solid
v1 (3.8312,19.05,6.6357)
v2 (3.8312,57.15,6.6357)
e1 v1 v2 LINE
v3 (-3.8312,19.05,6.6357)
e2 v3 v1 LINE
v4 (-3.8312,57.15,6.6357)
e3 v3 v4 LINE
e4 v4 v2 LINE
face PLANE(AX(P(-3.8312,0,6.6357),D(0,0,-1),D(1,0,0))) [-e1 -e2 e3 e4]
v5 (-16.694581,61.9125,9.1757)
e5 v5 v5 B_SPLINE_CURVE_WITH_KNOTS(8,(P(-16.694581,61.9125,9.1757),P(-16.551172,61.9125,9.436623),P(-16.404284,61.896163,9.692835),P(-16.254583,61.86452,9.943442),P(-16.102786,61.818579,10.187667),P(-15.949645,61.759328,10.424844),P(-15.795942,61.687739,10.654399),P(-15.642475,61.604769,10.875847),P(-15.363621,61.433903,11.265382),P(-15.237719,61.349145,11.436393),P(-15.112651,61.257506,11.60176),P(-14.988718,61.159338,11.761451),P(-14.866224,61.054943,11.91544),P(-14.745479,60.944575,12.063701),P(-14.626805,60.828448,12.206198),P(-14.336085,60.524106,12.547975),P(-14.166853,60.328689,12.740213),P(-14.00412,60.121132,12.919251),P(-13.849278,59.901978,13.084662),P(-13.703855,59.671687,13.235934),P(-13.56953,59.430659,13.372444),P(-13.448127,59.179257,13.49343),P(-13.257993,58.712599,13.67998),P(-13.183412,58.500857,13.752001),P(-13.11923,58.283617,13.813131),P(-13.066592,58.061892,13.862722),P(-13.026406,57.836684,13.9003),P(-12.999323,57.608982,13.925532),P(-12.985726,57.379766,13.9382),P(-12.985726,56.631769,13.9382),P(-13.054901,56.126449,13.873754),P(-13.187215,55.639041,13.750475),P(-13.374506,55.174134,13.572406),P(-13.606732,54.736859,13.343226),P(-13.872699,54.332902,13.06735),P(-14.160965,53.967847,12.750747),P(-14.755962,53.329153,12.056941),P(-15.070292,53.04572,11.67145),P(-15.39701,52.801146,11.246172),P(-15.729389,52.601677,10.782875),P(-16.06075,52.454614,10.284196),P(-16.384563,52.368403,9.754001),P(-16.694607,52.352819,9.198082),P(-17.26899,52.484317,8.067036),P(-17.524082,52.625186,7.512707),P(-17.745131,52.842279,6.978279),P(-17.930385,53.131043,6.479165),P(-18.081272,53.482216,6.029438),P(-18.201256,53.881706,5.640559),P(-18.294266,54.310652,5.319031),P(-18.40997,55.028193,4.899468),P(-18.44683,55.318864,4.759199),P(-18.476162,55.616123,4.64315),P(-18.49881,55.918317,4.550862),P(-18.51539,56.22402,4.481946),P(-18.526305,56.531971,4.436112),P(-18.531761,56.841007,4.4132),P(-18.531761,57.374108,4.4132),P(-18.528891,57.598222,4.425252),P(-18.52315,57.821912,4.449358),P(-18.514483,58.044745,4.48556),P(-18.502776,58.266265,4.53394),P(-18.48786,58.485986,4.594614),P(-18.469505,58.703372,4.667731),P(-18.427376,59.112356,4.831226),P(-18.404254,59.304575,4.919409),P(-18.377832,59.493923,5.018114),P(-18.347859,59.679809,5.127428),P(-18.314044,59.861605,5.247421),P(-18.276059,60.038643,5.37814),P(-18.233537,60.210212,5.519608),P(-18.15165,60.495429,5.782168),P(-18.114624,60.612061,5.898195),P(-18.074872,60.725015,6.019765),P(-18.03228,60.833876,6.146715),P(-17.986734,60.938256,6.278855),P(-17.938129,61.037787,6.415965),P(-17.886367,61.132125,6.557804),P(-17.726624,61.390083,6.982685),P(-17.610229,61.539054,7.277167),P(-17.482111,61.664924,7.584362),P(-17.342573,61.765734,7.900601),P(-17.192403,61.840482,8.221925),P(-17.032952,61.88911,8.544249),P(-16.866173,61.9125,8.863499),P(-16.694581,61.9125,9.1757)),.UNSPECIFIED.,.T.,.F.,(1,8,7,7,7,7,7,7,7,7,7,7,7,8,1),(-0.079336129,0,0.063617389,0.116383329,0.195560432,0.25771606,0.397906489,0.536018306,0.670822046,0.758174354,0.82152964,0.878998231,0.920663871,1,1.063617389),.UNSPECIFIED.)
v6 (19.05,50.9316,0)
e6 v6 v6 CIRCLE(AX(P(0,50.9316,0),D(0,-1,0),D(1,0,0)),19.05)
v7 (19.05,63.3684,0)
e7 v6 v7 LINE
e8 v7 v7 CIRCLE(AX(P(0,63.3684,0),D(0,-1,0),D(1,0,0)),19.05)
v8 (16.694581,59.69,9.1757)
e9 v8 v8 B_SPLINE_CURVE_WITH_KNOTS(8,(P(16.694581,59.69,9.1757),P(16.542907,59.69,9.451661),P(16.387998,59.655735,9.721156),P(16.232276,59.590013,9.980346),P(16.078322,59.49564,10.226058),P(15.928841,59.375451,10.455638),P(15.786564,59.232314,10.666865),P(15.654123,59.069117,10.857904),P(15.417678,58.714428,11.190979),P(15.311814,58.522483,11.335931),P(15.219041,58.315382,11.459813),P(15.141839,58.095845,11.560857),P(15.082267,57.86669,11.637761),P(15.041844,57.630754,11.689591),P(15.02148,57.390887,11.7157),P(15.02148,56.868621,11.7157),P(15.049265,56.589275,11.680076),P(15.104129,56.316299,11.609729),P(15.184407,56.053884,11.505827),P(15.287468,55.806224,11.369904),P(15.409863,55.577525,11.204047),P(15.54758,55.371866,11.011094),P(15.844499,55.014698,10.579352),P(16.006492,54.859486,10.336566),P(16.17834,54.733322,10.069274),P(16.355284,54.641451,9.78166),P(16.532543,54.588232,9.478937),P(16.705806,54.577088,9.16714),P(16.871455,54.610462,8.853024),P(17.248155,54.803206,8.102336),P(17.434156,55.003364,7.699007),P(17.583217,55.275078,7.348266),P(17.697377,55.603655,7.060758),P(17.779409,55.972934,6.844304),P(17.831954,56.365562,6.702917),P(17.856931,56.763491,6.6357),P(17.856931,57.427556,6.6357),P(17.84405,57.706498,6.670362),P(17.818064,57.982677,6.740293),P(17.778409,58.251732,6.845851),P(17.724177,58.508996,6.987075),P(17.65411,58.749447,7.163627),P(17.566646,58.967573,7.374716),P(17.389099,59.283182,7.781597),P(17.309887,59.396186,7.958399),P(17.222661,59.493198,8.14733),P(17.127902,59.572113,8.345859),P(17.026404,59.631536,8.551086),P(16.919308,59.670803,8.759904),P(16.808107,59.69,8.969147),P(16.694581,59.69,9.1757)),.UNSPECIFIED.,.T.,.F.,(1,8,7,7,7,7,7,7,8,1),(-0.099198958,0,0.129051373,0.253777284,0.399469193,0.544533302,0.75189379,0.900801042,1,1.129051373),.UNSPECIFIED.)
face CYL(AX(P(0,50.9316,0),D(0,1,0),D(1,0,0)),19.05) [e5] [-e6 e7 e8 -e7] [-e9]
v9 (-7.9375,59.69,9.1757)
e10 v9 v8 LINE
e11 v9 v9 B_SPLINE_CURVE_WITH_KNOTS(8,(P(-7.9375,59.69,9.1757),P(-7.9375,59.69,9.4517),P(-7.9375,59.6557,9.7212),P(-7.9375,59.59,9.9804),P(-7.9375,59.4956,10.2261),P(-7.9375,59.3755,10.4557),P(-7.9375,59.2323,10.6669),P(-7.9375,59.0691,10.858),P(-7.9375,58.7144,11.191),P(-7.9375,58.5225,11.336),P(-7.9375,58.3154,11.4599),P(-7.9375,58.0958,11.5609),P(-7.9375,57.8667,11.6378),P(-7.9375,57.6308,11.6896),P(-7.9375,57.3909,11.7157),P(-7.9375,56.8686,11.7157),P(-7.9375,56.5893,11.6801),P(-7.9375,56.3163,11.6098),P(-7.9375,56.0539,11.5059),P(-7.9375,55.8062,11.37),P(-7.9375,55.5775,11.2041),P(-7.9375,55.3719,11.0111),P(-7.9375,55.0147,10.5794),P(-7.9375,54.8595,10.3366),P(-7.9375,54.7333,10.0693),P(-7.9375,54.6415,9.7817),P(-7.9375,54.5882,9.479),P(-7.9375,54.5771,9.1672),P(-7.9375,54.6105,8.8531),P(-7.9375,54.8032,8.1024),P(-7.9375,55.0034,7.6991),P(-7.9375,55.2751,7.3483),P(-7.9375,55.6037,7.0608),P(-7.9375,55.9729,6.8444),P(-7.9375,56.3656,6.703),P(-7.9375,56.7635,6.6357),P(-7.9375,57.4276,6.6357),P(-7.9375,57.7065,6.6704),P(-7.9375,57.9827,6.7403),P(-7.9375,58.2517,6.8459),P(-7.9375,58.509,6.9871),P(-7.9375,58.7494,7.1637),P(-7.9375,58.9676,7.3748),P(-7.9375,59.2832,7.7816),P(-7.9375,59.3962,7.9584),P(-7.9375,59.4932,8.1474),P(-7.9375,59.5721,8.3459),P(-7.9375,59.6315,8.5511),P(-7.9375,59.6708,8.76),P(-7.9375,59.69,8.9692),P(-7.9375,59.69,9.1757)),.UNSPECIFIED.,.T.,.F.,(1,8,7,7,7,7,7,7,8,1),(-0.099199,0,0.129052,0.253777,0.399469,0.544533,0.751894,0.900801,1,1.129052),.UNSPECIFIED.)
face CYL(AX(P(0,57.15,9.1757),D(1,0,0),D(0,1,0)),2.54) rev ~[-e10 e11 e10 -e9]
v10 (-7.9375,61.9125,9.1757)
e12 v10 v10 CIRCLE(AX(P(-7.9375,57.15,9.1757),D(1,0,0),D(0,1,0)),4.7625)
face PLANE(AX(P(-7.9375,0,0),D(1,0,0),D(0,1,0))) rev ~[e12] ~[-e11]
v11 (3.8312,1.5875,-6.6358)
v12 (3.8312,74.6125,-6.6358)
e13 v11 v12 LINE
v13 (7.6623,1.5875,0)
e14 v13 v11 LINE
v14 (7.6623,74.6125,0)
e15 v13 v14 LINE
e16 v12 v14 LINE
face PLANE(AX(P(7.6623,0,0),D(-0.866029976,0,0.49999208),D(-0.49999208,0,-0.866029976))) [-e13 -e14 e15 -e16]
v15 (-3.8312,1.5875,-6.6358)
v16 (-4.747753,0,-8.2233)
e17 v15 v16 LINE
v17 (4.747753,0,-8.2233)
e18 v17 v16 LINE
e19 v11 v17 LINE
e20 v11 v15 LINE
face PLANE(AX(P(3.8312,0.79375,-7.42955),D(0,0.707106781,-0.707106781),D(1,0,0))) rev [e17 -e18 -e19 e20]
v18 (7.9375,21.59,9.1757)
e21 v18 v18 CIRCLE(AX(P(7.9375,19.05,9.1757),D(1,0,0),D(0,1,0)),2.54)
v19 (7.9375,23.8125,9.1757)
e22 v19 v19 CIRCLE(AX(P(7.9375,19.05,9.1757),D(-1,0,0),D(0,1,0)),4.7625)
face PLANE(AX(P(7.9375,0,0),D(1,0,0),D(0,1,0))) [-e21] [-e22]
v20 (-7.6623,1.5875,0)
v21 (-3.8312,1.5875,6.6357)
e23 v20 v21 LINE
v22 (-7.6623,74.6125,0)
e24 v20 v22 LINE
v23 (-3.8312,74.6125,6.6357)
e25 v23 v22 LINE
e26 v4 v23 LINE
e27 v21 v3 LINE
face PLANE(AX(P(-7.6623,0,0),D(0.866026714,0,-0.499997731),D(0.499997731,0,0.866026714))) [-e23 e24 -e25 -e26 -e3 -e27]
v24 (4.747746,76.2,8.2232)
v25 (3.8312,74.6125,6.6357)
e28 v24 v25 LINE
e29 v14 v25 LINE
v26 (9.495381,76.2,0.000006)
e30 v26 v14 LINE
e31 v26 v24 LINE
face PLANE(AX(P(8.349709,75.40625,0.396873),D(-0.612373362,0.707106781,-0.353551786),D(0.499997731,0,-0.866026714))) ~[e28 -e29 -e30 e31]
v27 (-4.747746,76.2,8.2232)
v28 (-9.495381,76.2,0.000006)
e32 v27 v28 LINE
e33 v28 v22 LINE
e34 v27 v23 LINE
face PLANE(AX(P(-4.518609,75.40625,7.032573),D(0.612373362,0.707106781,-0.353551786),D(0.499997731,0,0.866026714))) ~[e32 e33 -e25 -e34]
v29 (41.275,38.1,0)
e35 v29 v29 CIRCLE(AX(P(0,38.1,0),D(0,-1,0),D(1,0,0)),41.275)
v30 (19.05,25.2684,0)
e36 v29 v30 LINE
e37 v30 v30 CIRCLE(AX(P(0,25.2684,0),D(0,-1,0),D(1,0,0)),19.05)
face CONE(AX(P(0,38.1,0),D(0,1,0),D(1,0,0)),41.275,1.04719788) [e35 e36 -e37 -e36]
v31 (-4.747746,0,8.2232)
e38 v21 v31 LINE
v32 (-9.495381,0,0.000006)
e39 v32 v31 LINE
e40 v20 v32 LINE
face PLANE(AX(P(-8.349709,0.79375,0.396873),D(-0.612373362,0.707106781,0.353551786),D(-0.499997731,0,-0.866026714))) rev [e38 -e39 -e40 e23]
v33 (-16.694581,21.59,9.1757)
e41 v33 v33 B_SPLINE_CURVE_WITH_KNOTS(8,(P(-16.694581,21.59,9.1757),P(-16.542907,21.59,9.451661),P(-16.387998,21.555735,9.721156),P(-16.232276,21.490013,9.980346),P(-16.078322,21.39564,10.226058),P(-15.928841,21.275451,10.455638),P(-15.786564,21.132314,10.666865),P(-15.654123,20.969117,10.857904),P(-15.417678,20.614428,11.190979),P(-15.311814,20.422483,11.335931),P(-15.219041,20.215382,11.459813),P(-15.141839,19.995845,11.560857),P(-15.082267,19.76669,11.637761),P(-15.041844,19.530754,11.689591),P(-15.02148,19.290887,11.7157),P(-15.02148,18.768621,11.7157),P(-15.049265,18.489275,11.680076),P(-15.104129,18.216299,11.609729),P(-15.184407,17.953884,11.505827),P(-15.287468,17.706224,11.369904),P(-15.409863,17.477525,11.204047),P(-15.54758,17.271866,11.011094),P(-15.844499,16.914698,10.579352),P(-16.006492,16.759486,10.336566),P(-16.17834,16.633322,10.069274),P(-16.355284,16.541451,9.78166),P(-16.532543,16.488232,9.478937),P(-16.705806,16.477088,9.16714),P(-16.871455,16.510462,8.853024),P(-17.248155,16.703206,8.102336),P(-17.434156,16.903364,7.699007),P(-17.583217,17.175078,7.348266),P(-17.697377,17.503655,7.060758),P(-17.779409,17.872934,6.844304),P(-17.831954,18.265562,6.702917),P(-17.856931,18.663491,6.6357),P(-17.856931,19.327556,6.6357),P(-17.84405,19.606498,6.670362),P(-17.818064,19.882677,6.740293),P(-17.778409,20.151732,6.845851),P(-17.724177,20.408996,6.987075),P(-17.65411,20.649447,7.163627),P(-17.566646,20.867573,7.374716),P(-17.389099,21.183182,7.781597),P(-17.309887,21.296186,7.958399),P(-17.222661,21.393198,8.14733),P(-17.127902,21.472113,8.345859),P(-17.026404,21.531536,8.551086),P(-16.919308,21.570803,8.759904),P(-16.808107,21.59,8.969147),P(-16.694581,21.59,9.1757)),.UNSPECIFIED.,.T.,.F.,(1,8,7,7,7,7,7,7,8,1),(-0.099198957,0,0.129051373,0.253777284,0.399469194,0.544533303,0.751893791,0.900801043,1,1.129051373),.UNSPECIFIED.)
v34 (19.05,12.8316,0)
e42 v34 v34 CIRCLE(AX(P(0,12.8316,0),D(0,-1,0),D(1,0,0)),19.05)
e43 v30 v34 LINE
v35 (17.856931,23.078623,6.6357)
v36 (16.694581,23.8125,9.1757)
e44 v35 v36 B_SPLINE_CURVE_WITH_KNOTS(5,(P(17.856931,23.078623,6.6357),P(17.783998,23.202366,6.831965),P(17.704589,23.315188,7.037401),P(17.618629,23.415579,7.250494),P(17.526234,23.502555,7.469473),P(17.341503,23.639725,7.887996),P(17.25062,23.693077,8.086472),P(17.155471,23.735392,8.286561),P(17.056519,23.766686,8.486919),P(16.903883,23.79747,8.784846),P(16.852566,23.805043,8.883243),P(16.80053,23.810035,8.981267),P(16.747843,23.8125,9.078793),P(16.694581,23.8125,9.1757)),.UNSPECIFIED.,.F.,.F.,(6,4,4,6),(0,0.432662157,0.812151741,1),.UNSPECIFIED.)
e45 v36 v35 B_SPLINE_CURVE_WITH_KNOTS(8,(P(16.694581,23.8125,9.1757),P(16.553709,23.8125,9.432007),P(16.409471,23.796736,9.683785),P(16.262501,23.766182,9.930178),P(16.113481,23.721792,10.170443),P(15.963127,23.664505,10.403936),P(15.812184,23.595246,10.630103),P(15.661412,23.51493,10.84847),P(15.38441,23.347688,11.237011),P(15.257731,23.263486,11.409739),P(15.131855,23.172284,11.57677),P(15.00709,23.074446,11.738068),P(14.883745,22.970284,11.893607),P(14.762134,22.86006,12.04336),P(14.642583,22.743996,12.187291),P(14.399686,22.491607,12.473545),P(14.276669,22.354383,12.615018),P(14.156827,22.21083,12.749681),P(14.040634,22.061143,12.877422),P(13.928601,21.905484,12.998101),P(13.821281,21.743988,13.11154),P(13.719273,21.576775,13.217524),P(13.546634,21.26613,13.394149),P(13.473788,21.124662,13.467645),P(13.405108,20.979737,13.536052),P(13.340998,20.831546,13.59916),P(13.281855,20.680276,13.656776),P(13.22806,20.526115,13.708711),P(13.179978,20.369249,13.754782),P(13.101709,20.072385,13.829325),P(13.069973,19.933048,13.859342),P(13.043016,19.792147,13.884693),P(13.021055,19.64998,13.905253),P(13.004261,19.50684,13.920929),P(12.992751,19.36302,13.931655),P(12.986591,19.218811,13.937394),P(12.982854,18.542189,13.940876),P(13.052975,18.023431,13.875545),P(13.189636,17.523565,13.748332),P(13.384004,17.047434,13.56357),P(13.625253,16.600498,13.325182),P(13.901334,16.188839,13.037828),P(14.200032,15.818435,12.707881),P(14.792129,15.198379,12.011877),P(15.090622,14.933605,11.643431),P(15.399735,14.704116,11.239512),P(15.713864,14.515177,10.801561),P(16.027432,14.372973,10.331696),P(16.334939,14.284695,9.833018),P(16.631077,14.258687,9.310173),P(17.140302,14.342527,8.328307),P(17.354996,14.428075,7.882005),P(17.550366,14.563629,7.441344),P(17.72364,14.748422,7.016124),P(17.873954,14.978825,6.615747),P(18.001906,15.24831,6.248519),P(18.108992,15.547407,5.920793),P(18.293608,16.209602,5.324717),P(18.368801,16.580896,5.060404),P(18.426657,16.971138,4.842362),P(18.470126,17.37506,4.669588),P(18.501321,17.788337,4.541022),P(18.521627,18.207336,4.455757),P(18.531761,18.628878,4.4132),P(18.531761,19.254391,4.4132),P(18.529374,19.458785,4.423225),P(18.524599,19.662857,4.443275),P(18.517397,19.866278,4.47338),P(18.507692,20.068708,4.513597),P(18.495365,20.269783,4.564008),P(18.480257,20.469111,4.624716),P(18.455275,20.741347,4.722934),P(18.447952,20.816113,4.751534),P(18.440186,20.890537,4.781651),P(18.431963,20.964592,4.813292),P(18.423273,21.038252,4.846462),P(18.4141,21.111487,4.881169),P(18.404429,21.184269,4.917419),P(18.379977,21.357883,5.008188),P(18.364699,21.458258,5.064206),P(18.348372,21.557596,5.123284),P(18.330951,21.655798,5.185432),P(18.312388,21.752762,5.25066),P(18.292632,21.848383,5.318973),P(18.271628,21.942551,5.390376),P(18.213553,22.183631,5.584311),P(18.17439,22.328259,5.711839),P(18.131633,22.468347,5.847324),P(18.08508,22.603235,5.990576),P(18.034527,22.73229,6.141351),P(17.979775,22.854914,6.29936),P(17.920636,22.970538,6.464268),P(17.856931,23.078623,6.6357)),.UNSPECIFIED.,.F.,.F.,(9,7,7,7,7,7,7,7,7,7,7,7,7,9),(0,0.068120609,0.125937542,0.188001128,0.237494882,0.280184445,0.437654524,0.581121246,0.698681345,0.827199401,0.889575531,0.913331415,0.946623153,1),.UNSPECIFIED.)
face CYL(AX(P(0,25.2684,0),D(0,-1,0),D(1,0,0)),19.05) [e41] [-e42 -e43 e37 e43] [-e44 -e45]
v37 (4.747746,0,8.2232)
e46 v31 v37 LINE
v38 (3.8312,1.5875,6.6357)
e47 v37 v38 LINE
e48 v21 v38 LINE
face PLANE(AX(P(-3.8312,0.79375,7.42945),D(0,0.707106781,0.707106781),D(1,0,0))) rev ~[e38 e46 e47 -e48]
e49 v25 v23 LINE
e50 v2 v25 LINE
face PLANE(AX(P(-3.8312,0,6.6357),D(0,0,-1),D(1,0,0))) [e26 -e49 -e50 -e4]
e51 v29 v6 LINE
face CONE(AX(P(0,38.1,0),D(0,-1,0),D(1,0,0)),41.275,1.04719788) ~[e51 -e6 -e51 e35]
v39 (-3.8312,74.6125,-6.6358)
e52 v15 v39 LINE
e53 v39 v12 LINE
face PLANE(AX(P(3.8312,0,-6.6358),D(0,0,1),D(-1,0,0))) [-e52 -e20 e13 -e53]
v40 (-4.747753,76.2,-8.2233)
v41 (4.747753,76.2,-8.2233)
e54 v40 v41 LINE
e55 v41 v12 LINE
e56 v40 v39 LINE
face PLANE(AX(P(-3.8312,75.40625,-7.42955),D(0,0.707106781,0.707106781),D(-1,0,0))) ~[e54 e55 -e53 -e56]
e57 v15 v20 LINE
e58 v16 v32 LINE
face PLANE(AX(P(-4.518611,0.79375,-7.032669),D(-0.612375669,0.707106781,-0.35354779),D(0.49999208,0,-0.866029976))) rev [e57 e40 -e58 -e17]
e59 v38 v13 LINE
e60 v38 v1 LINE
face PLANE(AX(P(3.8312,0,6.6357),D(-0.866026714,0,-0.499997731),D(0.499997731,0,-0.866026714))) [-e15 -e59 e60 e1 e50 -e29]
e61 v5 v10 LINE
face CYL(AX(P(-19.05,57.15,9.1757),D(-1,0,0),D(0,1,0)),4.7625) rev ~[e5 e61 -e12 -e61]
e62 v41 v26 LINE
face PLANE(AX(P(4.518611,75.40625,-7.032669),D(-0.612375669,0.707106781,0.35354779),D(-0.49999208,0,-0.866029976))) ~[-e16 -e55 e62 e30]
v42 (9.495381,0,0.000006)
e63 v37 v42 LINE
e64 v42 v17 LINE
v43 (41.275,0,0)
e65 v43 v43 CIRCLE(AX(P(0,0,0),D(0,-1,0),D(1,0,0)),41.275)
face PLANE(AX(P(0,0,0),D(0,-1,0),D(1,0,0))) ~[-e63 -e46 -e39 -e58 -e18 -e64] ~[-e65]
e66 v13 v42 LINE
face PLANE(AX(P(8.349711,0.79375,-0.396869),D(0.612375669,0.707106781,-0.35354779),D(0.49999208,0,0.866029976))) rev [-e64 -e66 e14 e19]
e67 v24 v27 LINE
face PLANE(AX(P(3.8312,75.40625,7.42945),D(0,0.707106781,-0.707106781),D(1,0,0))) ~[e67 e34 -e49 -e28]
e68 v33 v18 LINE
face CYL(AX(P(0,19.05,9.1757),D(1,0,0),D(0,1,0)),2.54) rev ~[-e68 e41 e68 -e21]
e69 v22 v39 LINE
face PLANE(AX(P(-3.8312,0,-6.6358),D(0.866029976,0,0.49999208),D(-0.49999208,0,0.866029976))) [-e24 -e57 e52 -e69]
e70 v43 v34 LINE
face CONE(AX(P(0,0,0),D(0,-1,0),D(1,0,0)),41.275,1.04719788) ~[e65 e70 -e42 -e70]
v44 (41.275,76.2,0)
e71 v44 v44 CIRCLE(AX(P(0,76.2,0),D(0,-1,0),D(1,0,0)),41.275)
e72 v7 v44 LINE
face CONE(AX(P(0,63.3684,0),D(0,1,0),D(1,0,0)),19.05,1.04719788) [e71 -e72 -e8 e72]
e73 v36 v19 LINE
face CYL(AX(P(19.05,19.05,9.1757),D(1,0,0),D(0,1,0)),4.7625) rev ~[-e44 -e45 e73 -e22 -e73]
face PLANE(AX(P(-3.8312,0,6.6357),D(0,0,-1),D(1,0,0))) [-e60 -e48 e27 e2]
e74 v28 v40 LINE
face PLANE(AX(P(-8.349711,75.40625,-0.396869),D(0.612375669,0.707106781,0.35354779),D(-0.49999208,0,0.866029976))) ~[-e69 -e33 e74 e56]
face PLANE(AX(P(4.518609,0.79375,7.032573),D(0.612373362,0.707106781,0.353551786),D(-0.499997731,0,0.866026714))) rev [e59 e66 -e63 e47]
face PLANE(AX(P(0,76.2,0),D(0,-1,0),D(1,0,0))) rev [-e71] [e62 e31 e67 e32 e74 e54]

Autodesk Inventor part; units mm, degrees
ref_plane "XZ Plane" through (0, 0, 0) normal (0, 1, 0) x (-1, 0, 0)
sketch "Sketch15" plane through (0, 0, 0) normal (0, 0, 1) x (1, 0, 0)
  line L0 (41.275, 0) -> (41.275, 76.2) construction
  line L1 (0, 0) -> (41.275, 0)
  line L2 (0, 76.2) -> (41.275, 76.2)
  line L3 (19.05, 0) -> (19.05, 76.2) construction
  line L4 (0, 76.2) -> (0, 0)
  line L5 (19.05, 19.05) -> (41.275, 19.05) construction
  line L6 (41.275, 0) -> (19.05, 12.8316)
  line L7 (41.275, 38.1) -> (19.05, 25.2684)
  line L8 (19.05, 25.2684) -> (41.275, 25.2684) construction
  line L9 (19.05, 25.2684) -> (19.05, 12.8316)
  line L10 (41.275, 38.1) -> (19.05, 50.9316)
  line L11 (19.05, 50.9316) -> (19.05, 63.3684)
  line L12 (19.05, 63.3684) -> (41.275, 76.2)
  line L13 (41.275, 38.1) -> (19.05, 38.1) construction
  line L14 (19.05, 63.3684) -> (41.275, 63.3684) construction
  dimension "d85" = 41.275
  dimension "d86" = 76.2
  dimension "d87" = 19.05
  dimension "d88" = 41.275
  dimension "d89" = 38.1
  dimension "centerLineForSpool" = 19.05
  dimension "d93" = 30
  dimension "d94" = 30
  dimension "d95" = 30
  dimension "d96" = 30
revolve "Revolution2" add sketch "Sketch15" angle 360 about axis through (0, 76.2, 0) along (0, -1, 0)
sketch "Sketch16" plane through (0, 0, 0) normal (0, -1, 0) x (1, 0, 0)
  line L0 (-7.6623, 0) -> (-3.8312, 6.6357)
  line L1 (-3.8312, 6.6357) -> (3.8312, 6.6357)
  line L2 (3.8312, 6.6357) -> (7.6623, 0)
  line L3 (7.6623, 0) -> (3.8312, -6.6358)
  line L4 (3.8312, -6.6358) -> (-3.8312, -6.6358)
  line L5 (-3.8312, -6.6358) -> (-7.6623, 0)
  point P0 (0, 0)
  point P1 (0, 0)
  dimension "d103" = 13.2715
extrude "Extrusion11" cut sketch "Sketch16" against normal through all
sketch "Sketch17" plane through (0, 0, 0) normal (1, 0, 0) x (0, 1, 0)
  circle A0 centre (57.15, 9.1757) radius 2.54
  circle A1 centre (19.05, 9.1757) radius 2.54
  line L0 (0, 41.275) -> (0, -41.275) projected
  line L1 (76.2, 41.275) -> (76.2, -41.275) projected
  line L2 (0, 6.6357) -> (76.2, 6.6357) projected
  point P0 (0, 0)
  dimension "d110" = 19.05
  dimension "d111" = 19.05
  dimension "d112" = 5.08
extrude "Extrusion13" cut sketch "Sketch17" along normal through all both and the other way through all
ref_plane "Work Plane4" through (-19.05, 0, 0) normal (1, 0, 0) x (0, 1, 0)
sketch "Sketch22" plane through (-19.05, 0, 0) normal (1, 0, 0) x (0, 1, 0)
  spline S0 degree 8 poles (59.69, 9.1757) (59.69, 9.4517) (59.6557, 9.7212) (59.59, 9.9804) (59.4956, 10.2261) (59.3755, 10.4557) (59.2323, 10.6669) (59.0691, 10.858) (58.7144, 11.191) (58.5225, 11.336) (58.3154, 11.4599) (58.0958, 11.5609) (57.8667, 11.6378) (57.6308, 11.6896) (57.3909, 11.7157) (56.8686, 11.7157) (56.5893, 11.6801) (56.3163, 11.6098) (56.0539, 11.5059) (55.8062, 11.37) (55.5775, 11.2041) (55.3719, 11.0111) (55.0147, 10.5794) (54.8595, 10.3366) (54.7333, 10.0693) (54.6415, 9.7817) (54.5882, 9.479) (54.5771, 9.1672) (54.6105, 8.8531) (54.8032, 8.1024) (55.0034, 7.6991) (55.2751, 7.3483) (55.6037, 7.0608) (55.9729, 6.8444) (56.3656, 6.703) (56.7635, 6.6357) (57.4276, 6.6357) (57.7065, 6.6704) (57.9827, 6.7403) (58.2517, 6.8459) (58.509, 6.9871) (58.7494, 7.1637) (58.9676, 7.3748) (59.2832, 7.7816) (59.3962, 7.9584) (59.4932, 8.1474) (59.5721, 8.3459) (59.6315, 8.5511) (59.6708, 8.76) (59.69, 8.9692) (59.69, 9.1757) knots 0 0 0 0 0 0 0 0 0 0.129052 0.129052 0.129052 0.129052 0.129052 0.129052 0.129052 0.253777 0.253777 0.253777 0.253777 0.253777 0.253777 0.253777 0.399469 0.399469 0.399469 0.399469 0.399469 0.399469 0.399469 0.544533 0.544533 0.544533 0.544533 0.544533 0.544533 0.544533 0.751894 0.751894 0.751894 0.751894 0.751894 0.751894 0.751894 0.900801 0.900801 0.900801 0.900801 0.900801 0.900801 0.900801 1 1 1 1 1 1 1 1 1 projected
  circle A0 centre (57.15, 9.1757) radius 4.7625
  circle A1 centre (57.15, 9.1757) radius 2.54 construction
  line L0 (57.15, 6.6357) -> (76.2, 6.6357) construction
  line L1 (76.2, 41.275) -> (76.2, -41.275) construction
  point P0 (0, 0)
  dimension "d121" = 19.05
  dimension "d122" = 5.08
  dimension "d125" = 9.525
extrude "Extrusion16" cut sketch "Sketch22" along normal blind 11.1125
ref_plane "Work Plane5" through (19.05, 0, 0) normal (1, 0, 0) x (0, 1, 0)
sketch "Sketch23" plane through (19.05, 0, 0) normal (1, 0, 0) x (0, 1, 0)
  line L0 (19.05, 6.6357) -> (57.15, 6.6357) projected
  circle A0 centre (19.05, 9.1757) radius 2.54 construction
  line L1 (0, 41.275) -> (0, -41.275) projected
  circle A1 centre (19.05, 9.1757) radius 4.7625
  point P0 (0, 0)
  dimension "d127" = 5.08
  dimension "d128" = 19.05
  dimension "d129" = 9.525
extrude "Extrusion17" cut sketch "Sketch23" against normal blind 11.1125
chamfer "Chamfer10" distance 1.5875 angle 45 12 edges at (0, 76.2, -6.6358) (5.7467, 76.2, -3.3179) (5.7467, 76.2, 3.3179) (0, 76.2, 6.6357) (-5.7467, 76.2, 3.3179) (-5.7467, 76.2, -3.3179) (-5.7467, 0, -3.3179) (-5.7467, 0, 3.3179) (0, 0, 6.6357) (5.7467, 0, 3.3179) (5.7467, 0, -3.3179) (0, 0, -6.6358)
equation "\"d85\" = spoolExteriorRadius"
equation "\"d86\" = spoolOverallHeight"
equation "\"d88\" = d85"
equation "\"d89\" = 0.5 * spoolOverallHeight"
equation "\"centerLineForSpool\" = 0.25 * spoolOverallHeight"
equation "\"d103\" = hexDiameter"
equation "\"d110\" = centerLineForSpool"
equation "\"d111\" = centerLineForSpool"
equation "\"d112\" = holeForString"
equation "\"d121\" = centerLineForSpool"
equation "\"d122\" = holeForString"
equation "\"d125\" = knotHoleDiameter"
equation "\"d127\" = holeForString"
equation "\"d128\" = centerLineForSpool"
equation "\"d129\" = knotHoleDiameter"
equation "\"d130\" = knotHoleDepth"
equation "\"d132\" = hexHoleChamfer"
equation "\"holeForString\" = stringDiameter + clearanceForString"
equation "\"stringDiameter\" = 3.048"
equation "\"clearanceForString\" = 2.032"
equation "\"spoolHeightWithoutSpacer\" = 69.85"
equation "\"hexShaftDiameter\" = 12.7"
equation "\"clearanceForHexShaft\" = 0.5715"
equation "\"hexDiameter\" = hexShaftDiameter + clearanceForHexShaft"
equation "\"supportChannels\" = 3.81"
equation "\"spoolInteriorDiameter\" = 38.1"
equation "\"spoolInteriroRadius\" = 0.5 * spoolInteriorDiameter"
equation "\"spoolExteriorDiameter\" = 82.55"
equation "\"spoolExteriorRadius\" = 0.5 * spoolExteriorDiameter"
equation "\"spoolFiletRadius\" = 0.5 * supportChannels"
equation "\"holeCenter\" = 0.25 * spoolHeightWithoutSpacer - 0.75 * supportChannels"
equation "\"hexHoleChamfer\" = 1.5875"
equation "\"stringHoleCenterFromHexShaft\" = 0.5 * hexDiameter + 0.5 * holeForString"
equation "\"textCircleDiameter\" = 0.75 * spoolExteriorDiameter"
equation "\"textHeight\" = 6.096"
equation "\"textDepth\" = 1.27"
equation "\"stringHoleChamfer\" = 4.7625"
equation "\"spoolTotalHeight\" = 76.2"
equation "\"spaceHeight\" = spoolTotalHeight - spoolHeightWithoutSpacer"
equation "\"spacerDiameter\" = 24.13"
equation "\"spoolOverallHeight\" = 76.2"
equation "\"d114\" = -spoolInteriroRadius"
equation "\"knotHoleDiameter\" = 9.525"
equation "\"d126\" = spoolInteriroRadius"
equation "\"knotHoleDepth\" = 11.1125"
properties part number "spoolV07" material "PC/ABS Plastic"
